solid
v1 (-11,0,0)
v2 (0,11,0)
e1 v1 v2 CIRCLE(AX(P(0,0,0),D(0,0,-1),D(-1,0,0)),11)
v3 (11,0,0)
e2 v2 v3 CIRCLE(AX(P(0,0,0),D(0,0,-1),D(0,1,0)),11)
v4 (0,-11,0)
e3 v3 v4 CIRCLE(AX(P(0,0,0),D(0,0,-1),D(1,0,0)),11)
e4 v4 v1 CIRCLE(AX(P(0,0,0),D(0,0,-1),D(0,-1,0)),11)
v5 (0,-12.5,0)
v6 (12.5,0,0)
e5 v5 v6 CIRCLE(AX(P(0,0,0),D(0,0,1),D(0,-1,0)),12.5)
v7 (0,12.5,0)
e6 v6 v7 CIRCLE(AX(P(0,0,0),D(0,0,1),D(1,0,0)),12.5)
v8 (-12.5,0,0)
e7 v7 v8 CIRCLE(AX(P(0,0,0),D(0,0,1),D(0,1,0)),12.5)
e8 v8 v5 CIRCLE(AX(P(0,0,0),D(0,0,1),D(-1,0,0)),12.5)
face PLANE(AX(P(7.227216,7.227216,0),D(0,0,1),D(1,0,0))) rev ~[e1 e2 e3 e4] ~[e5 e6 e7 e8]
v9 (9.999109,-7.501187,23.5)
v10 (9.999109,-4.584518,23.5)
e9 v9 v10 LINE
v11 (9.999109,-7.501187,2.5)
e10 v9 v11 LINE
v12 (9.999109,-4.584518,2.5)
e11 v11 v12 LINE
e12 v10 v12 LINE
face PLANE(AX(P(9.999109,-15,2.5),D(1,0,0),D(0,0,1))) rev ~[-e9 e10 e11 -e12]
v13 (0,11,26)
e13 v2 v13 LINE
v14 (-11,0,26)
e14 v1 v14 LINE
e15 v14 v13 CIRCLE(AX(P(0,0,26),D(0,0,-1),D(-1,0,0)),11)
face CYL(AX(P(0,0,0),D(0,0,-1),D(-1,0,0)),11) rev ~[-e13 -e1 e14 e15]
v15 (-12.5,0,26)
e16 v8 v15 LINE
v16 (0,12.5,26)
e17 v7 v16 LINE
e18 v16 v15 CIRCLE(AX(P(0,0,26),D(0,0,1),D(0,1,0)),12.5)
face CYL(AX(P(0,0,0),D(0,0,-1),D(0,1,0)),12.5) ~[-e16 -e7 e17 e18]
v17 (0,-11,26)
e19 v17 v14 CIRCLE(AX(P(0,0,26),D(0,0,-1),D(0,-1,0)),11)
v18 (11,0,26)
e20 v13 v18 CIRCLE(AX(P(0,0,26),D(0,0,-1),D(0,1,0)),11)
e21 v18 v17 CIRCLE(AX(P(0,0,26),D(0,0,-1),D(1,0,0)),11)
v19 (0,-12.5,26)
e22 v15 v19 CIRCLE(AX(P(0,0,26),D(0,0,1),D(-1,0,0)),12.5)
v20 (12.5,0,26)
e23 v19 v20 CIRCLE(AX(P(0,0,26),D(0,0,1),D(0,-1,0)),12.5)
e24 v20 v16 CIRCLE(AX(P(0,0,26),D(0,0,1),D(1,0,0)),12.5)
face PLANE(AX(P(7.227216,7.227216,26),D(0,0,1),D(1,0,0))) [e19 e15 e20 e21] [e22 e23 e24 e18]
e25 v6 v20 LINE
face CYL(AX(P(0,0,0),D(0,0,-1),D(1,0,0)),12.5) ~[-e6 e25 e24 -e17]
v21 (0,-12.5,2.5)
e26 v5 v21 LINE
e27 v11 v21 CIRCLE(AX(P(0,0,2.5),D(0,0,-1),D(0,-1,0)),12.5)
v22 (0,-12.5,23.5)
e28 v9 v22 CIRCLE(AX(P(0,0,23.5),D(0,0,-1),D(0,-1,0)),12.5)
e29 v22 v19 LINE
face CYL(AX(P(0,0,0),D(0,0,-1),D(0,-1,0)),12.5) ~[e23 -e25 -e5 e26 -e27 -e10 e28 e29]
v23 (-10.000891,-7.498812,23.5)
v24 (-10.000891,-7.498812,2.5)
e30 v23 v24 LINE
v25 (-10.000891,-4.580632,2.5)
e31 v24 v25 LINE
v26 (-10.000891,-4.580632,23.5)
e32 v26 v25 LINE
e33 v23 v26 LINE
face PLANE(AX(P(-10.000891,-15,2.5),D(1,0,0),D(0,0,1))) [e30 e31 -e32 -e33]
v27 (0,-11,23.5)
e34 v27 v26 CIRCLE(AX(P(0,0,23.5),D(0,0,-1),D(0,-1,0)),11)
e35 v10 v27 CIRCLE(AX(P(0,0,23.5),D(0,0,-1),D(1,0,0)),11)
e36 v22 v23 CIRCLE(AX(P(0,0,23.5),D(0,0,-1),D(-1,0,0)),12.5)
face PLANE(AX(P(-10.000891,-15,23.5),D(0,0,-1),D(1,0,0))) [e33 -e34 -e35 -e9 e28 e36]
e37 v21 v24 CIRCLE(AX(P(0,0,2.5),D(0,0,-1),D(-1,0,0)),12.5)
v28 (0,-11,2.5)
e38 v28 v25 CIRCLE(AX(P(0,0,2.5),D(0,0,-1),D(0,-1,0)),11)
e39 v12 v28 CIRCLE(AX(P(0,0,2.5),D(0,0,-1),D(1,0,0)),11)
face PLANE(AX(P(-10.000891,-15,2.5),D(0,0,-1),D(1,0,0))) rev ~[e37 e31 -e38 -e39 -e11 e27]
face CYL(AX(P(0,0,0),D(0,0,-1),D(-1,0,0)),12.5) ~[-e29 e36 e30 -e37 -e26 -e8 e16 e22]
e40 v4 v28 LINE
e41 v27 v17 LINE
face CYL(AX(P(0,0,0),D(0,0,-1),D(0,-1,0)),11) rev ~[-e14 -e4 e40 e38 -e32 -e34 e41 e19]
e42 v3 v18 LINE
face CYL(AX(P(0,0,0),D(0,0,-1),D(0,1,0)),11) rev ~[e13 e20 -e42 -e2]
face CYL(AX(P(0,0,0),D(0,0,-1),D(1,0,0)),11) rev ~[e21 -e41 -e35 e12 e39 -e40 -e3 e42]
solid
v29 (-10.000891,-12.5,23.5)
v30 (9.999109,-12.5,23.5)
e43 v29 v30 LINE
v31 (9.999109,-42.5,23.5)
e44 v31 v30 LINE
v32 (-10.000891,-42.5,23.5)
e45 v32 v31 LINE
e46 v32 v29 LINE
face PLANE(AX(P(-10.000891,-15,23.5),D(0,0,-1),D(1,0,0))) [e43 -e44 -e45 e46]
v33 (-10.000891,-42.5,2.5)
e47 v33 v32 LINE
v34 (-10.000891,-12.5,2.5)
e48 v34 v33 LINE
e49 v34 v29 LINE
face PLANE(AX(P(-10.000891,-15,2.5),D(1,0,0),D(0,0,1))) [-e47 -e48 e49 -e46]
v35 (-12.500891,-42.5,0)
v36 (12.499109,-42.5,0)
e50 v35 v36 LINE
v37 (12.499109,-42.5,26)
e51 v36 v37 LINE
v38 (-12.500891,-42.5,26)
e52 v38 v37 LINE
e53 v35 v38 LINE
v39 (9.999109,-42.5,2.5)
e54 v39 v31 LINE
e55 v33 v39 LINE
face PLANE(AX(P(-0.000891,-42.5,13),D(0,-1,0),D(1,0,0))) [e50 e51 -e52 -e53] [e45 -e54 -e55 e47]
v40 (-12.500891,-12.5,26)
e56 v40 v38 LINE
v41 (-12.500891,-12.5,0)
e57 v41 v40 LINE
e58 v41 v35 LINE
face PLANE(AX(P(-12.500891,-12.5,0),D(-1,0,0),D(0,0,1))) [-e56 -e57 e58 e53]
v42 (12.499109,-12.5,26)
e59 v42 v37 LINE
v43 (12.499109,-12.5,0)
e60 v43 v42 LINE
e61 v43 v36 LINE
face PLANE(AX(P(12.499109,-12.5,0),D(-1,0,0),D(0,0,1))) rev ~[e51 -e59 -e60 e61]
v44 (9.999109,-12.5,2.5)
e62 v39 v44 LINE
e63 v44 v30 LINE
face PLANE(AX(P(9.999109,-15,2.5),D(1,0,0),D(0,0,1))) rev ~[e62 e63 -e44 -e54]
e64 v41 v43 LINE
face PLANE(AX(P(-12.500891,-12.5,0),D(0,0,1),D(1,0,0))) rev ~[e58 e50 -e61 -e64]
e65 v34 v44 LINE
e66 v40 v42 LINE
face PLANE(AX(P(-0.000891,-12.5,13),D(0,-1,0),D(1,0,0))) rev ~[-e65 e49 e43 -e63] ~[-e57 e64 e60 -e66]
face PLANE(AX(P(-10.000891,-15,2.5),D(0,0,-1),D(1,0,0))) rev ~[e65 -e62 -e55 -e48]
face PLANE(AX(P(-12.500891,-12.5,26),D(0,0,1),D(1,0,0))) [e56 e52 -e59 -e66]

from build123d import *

# Parameters (mm, degrees)
F1_DEPTH = 26
F3_W     = 25
F3_H     = 26
F4_DEPTH = 30
F5_T     = -2.5
F6_DEPTH = 15


with BuildPart() as f1:
    # F0 (on Top) → F1 (new body)
    with BuildSketch(Plane.XY):
        with BuildLine():
            Line((11, 0), (12.5, 0))
            ThreePointArc((12.5, 0), (8.8388347648, 8.8388347648), (0, 12.5))
            Line((0, 12.5), (0, 11))
            ThreePointArc((0, 11), (7.7781745931, 7.7781745931), (11, 0))
        make_face()
        with BuildLine():
            Line((0, 11), (0, 12.5))
            ThreePointArc((0, 12.5), (-8.8388347648, 8.8388347648), (-12.5, 0))
            Line((-12.5, 0), (-11, 0))
            ThreePointArc((-11, 0), (-7.7781745931, 7.7781745931), (0, 11))
        make_face()
        with BuildLine():
            ThreePointArc((-12.5, 0), (-8.8388347648, -8.8388347648), (0, -12.5))
            Line((0, -12.5), (0, -11))
            ThreePointArc((0, -11), (-7.7781745931, -7.7781745931), (-11, 0))
            Line((-11, 0), (-12.5, 0))
        make_face()
        with BuildLine():
            ThreePointArc((0, -12.5), (8.8388347648, -8.8388347648), (12.5, 0))
            Line((12.5, 0), (11, 0))
            ThreePointArc((11, 0), (7.7781745931, -7.7781745931), (0, -11))
            Line((0, -11), (0, -12.5))
        make_face()
    extrude(amount=F1_DEPTH)


with BuildPart() as f4:
    # F3 (on offset) → F4 (new body)
    with BuildSketch(Plane.XZ.offset(12.5)):
        with Locations((-0.0008905306, 13)):
            Rectangle(F3_W, F3_H)
    extrude(amount=F4_DEPTH)

    # F5
    f5_openings = [f4.faces().sort_by_distance(p)[0] for p in [
        (-0.000891, -42.5, 13),
    ]]
    offset(amount=F5_T, openings=f5_openings)


with BuildPart() as f6_tool:
    # F6 (cut): a face of the model
    f6_faces = [f4.part.faces().sort_by_distance(p)[0] for p in [
        (-0.0008905306, -15, 13),
    ]]
    extrude(f6_faces, amount=-F6_DEPTH)


with BuildPart() as f1_1:
    add(f1.part)

    # F6: cut by f6_tool
    add(f6_tool.part, mode=Mode.SUBTRACT)


with BuildPart() as f4_1:
    add(f4.part)

    # F6: cut by f6_tool
    add(f6_tool.part, mode=Mode.SUBTRACT)


solid = Compound([f1_1.part, f4_1.part])
